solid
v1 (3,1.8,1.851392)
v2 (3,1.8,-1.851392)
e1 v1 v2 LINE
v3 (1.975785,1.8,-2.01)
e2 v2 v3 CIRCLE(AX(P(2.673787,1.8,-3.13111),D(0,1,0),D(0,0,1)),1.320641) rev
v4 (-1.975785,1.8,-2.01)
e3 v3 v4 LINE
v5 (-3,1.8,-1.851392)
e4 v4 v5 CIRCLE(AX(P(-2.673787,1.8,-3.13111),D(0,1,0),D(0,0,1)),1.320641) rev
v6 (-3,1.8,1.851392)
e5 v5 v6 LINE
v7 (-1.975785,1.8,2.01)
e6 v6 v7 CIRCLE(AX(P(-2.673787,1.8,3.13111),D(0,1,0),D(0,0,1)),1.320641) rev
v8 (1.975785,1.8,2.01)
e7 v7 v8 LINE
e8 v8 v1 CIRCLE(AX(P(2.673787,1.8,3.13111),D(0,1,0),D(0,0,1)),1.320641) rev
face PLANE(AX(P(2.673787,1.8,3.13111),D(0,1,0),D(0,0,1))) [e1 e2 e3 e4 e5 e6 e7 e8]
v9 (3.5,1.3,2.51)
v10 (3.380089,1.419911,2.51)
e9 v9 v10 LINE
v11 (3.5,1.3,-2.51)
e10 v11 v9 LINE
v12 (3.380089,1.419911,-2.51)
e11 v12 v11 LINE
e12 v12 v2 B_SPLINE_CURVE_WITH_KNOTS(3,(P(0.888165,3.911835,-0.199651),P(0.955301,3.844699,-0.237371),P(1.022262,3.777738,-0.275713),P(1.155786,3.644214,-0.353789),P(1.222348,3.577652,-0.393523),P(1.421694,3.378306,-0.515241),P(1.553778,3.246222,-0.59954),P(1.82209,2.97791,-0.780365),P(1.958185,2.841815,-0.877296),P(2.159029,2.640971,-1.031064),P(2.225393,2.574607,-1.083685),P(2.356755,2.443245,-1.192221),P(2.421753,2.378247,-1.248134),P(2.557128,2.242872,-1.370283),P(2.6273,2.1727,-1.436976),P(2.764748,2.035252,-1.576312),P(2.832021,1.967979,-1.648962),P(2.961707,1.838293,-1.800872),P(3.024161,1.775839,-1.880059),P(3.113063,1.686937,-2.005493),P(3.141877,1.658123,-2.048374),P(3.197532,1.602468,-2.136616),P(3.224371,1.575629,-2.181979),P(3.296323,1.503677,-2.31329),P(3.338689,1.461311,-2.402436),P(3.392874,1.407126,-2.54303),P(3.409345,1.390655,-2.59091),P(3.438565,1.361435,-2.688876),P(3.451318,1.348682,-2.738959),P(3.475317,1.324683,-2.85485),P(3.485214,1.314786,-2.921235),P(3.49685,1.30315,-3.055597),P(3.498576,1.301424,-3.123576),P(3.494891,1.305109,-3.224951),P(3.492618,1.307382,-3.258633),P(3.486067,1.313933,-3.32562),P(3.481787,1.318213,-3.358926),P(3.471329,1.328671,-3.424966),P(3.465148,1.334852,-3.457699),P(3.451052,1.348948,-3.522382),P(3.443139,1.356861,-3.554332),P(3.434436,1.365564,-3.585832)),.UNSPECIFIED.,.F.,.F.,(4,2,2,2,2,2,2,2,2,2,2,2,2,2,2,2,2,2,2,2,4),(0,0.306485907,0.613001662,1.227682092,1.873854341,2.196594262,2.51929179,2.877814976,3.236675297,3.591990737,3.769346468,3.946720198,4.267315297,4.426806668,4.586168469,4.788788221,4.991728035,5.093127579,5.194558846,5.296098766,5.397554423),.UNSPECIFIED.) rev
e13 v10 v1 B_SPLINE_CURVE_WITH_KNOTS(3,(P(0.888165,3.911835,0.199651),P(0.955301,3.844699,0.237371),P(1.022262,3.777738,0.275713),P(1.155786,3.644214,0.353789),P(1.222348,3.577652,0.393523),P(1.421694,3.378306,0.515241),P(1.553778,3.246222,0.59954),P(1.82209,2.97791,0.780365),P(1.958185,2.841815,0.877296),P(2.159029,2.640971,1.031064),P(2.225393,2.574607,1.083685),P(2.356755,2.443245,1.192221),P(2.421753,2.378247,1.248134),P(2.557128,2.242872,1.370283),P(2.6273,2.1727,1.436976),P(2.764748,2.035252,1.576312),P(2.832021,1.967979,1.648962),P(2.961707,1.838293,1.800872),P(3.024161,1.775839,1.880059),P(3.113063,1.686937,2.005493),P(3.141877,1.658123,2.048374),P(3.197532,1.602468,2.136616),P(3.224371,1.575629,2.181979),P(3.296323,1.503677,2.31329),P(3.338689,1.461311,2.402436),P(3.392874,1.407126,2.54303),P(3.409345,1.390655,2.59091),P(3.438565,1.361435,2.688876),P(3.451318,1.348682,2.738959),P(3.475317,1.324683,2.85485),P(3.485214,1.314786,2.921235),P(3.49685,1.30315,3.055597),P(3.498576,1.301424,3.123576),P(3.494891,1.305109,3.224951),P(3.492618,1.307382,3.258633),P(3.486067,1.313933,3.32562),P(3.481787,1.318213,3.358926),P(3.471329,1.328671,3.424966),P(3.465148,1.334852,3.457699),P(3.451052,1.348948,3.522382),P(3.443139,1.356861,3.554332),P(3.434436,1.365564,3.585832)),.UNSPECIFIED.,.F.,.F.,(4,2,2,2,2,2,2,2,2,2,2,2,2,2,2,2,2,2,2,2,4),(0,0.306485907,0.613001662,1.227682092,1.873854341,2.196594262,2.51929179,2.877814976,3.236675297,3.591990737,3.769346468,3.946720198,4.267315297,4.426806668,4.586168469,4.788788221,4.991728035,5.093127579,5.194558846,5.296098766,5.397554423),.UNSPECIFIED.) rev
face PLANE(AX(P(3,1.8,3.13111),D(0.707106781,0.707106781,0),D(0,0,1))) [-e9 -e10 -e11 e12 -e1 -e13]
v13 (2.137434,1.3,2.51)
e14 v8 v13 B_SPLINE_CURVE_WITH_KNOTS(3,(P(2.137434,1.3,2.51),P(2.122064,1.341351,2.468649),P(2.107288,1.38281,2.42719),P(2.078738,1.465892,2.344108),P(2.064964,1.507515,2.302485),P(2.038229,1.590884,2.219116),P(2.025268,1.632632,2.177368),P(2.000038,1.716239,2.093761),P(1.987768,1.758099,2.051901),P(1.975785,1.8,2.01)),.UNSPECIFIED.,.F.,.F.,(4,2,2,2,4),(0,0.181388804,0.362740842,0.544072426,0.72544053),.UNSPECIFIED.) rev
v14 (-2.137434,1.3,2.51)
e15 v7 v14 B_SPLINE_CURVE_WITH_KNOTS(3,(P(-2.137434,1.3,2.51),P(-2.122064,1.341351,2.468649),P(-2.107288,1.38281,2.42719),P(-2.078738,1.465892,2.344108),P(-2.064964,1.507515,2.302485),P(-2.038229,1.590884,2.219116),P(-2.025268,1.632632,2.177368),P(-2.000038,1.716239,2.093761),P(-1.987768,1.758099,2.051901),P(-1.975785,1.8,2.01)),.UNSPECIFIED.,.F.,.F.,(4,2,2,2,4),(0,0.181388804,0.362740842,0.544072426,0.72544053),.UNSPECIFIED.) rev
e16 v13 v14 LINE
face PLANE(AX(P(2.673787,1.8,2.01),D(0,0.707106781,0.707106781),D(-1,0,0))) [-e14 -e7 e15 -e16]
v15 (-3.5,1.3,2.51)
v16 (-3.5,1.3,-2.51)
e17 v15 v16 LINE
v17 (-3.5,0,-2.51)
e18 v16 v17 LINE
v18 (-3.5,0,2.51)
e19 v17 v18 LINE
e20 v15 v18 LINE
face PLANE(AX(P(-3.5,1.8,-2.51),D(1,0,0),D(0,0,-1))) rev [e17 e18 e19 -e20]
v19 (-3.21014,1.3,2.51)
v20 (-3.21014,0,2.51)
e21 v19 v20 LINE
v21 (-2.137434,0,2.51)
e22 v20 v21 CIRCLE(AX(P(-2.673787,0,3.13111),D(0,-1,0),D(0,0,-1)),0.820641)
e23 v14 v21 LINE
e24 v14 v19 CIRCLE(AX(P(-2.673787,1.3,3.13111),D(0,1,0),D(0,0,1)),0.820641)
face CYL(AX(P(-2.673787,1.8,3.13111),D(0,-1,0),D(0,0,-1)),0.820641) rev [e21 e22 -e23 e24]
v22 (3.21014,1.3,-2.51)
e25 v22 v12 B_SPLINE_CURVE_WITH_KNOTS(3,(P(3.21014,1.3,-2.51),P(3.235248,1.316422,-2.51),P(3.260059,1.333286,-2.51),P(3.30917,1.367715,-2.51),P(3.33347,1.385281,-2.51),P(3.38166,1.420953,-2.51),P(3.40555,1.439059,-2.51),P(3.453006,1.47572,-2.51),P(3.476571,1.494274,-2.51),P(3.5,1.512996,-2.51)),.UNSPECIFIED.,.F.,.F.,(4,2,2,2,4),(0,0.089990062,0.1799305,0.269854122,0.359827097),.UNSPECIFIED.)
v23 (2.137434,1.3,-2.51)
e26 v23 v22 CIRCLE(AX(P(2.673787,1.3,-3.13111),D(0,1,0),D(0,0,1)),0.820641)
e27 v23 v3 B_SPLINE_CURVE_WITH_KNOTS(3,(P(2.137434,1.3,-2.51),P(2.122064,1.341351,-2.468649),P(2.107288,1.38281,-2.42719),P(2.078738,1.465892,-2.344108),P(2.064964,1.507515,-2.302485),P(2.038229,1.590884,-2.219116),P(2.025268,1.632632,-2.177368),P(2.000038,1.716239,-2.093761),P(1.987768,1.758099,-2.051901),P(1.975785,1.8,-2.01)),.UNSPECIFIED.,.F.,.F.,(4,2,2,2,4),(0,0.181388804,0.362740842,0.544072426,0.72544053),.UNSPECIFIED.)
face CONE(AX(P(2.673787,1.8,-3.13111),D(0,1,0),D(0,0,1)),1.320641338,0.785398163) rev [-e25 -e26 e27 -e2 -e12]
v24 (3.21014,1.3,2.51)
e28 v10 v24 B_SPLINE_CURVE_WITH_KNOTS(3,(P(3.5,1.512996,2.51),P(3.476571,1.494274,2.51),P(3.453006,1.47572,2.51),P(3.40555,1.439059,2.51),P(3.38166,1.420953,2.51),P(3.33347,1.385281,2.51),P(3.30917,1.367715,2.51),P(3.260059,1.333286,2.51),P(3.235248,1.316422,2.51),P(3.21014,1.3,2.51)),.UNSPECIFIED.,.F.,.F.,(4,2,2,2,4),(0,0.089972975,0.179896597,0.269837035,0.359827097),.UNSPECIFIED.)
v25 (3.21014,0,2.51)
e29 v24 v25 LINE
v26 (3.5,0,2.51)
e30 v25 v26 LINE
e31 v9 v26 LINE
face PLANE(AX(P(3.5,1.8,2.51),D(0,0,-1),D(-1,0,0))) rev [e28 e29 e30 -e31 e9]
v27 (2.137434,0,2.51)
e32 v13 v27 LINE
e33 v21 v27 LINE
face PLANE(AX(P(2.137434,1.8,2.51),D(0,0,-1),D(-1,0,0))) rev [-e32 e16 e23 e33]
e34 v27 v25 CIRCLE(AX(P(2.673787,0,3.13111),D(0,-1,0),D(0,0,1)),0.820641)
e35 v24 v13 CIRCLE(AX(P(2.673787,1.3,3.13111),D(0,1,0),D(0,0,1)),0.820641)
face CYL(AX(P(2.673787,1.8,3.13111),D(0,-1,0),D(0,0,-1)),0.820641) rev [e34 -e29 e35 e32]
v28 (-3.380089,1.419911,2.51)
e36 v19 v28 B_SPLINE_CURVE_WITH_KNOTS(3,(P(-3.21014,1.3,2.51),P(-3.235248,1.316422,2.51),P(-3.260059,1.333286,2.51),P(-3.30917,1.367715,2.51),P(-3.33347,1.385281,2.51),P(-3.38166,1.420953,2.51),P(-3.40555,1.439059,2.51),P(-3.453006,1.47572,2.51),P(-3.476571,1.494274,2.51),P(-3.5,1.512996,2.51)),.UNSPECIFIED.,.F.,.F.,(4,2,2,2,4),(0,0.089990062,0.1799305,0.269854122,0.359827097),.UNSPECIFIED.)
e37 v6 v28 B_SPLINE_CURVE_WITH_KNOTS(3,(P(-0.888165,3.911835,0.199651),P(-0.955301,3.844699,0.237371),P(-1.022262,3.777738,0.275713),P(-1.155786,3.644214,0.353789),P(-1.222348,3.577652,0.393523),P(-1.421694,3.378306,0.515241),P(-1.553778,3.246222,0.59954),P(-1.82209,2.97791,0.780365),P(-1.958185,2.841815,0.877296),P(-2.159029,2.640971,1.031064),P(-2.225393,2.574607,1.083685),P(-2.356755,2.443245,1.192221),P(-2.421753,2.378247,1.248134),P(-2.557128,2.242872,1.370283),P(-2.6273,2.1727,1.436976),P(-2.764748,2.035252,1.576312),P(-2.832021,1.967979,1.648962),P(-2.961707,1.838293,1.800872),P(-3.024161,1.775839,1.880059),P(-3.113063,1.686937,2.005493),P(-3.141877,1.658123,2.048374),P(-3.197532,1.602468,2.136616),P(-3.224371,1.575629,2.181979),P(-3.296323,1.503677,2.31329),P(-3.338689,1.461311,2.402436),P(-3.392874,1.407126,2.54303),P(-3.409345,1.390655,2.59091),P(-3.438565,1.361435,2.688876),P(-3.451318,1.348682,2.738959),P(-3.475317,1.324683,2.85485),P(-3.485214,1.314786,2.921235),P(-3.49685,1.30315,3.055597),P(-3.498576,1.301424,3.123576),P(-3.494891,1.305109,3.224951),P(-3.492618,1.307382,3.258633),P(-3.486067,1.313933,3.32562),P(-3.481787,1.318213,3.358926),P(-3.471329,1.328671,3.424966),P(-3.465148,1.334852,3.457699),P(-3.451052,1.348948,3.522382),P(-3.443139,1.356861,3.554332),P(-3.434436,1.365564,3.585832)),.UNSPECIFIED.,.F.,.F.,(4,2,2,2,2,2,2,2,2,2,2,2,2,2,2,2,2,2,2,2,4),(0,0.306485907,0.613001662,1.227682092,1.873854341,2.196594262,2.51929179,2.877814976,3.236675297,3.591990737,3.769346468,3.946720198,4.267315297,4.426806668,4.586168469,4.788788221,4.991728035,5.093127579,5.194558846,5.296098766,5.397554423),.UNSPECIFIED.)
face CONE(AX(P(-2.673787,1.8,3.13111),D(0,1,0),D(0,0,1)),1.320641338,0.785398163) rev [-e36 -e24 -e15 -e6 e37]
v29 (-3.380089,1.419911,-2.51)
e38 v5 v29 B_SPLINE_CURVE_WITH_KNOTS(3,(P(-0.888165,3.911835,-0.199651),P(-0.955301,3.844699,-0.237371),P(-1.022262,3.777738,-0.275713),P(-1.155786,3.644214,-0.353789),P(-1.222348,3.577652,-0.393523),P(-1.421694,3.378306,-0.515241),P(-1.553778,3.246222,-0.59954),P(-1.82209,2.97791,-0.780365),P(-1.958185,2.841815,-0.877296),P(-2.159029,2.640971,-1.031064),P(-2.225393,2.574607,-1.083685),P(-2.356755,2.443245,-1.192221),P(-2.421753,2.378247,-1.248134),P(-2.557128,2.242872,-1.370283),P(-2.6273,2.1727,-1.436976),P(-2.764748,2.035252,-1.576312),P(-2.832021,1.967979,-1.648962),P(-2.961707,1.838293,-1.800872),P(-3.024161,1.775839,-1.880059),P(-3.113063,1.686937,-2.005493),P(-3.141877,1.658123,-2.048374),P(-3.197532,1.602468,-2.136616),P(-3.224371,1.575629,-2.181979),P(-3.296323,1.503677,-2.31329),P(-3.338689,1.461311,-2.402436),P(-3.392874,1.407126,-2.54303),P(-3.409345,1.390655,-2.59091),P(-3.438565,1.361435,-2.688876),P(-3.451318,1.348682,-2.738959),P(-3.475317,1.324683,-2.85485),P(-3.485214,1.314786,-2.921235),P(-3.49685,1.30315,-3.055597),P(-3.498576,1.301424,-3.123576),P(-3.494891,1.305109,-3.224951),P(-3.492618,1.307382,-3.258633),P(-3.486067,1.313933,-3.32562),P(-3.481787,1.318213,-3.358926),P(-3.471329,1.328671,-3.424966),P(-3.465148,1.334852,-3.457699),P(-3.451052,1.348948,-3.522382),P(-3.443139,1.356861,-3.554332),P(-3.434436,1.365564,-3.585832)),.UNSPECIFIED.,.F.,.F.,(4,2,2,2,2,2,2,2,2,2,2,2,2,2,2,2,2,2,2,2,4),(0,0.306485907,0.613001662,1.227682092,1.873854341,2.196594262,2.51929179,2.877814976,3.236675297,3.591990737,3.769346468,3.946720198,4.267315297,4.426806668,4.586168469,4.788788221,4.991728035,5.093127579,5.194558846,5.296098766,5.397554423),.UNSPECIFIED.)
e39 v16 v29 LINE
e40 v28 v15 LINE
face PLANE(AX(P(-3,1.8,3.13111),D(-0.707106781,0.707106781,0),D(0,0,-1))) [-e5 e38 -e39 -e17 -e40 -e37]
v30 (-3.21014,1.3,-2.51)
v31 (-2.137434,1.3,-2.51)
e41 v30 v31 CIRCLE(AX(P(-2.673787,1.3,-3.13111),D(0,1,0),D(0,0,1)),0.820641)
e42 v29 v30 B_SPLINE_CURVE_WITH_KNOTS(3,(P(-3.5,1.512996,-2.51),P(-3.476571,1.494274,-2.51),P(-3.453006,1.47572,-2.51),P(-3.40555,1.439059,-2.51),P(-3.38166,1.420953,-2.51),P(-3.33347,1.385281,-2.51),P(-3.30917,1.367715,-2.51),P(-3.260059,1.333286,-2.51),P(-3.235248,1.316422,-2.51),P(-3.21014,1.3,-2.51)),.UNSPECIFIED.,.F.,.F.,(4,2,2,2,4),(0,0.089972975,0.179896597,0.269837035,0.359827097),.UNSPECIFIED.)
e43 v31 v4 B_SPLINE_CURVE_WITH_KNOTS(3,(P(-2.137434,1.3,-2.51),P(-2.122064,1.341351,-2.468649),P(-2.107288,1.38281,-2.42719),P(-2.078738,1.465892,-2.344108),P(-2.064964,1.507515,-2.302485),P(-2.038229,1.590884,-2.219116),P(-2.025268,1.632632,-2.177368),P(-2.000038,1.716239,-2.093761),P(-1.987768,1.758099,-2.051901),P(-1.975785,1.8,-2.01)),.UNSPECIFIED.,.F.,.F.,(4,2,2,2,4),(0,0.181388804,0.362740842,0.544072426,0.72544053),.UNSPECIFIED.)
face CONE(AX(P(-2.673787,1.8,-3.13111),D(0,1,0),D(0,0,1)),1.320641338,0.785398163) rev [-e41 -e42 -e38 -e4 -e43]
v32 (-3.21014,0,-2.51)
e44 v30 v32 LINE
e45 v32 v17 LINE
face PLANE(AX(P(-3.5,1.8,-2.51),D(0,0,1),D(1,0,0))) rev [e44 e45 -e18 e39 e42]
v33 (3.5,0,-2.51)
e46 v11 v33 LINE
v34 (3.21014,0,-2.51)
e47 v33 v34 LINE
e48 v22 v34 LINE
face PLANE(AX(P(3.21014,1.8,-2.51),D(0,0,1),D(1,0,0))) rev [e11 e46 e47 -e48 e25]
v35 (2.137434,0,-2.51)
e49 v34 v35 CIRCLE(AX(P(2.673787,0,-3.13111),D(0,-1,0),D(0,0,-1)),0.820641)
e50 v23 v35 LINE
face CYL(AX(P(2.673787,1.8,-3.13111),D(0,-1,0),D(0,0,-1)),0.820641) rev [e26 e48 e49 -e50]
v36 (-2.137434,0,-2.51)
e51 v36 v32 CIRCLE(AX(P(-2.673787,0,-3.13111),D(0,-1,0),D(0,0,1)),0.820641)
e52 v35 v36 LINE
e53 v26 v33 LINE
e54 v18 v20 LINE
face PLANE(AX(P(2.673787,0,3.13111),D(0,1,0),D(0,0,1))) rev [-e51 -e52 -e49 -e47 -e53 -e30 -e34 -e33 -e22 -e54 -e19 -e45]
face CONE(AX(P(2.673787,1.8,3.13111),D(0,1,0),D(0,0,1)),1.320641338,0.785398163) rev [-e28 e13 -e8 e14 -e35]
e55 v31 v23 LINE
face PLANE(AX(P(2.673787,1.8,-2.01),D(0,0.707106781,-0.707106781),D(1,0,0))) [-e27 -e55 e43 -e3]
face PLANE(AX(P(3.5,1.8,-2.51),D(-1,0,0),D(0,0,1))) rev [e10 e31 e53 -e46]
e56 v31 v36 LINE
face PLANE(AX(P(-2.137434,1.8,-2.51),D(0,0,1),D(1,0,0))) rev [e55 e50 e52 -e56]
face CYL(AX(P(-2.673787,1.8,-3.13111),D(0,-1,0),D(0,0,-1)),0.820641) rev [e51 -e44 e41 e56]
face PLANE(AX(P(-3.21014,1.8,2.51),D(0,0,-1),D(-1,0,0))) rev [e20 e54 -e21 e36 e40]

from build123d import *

# Parameters (mm, degrees)
EXTRUDE_1_DEPTH = 1.8
CHAMFER_1_SIZE  = 0.5


with BuildPart() as part:
    # Эскиз1 → Бобышка-Вытянуть1 (new body)
    with BuildSketch(Plane(origin=(0, 0, 0), x_dir=(1, 0, 0), z_dir=(0, 1, 0))):
        with BuildLine():
            Line((-3.5, 2.51), (-3.210140252, 2.51))
            ThreePointArc((-3.210140252, 2.51), (-2.673786949, 2.310468426), (-2.137433645, 2.51))
            Line((-2.137433645, 2.51), (2.137433645, 2.51))
            ThreePointArc((2.137433645, 2.51), (2.673786949, 2.310468426), (3.210140252, 2.51))
            Line((3.210140252, 2.51), (3.5, 2.51))
            Line((3.5, 2.51), (3.5, -2.51))
            Line((3.5, -2.51), (3.210140252, -2.51))
            ThreePointArc((3.210140252, -2.51), (2.673786949, -2.310468426), (2.137433645, -2.51))
            Line((2.137433645, -2.51), (-2.137433645, -2.51))
            ThreePointArc((-2.137433645, -2.51), (-2.673786949, -2.310468426), (-3.210140252, -2.51))
            Line((-3.210140252, -2.51), (-3.5, -2.51))
            Line((-3.5, -2.51), (-3.5, 2.51))
        make_face()
    extrude(amount=EXTRUDE_1_DEPTH)

    # Фаска1
    chamfer_1_edges = [part.edges().sort_by_distance(p)[0] for p in [
        (-3.5, 1.8, 0),
    ]]
    chamfer(chamfer_1_edges, length=CHAMFER_1_SIZE)
    chamfer_1_2_edges = [part.edges().sort_by_distance(p)[0] for p in [
        (3.5, 1.8, 0),
    ]]
    chamfer(chamfer_1_2_edges, length=CHAMFER_1_SIZE)
    chamfer_1_3_edges = [part.edges().sort_by_distance(p)[0] for p in [
        (-2.54973161, 1.8, 2.319899262),
    ]]
    chamfer(chamfer_1_3_edges, length=CHAMFER_1_SIZE)
    chamfer_1_4_edges = [part.edges().sort_by_distance(p)[0] for p in [
        (-2.54973161, 1.8, -2.319899262),
    ]]
    chamfer(chamfer_1_4_edges, length=CHAMFER_1_SIZE)
    chamfer_1_5_edges = [part.edges().sort_by_distance(p)[0] for p in [
        (2.54973161, 1.8, -2.319899262),
    ]]
    chamfer(chamfer_1_5_edges, length=CHAMFER_1_SIZE)
    chamfer_1_6_edges = [part.edges().sort_by_distance(p)[0] for p in [
        (2.54973161, 1.8, 2.319899262),
    ]]
    chamfer(chamfer_1_6_edges, length=CHAMFER_1_SIZE)
    chamfer_1_7_edges = [part.edges().sort_by_distance(p)[0] for p in [
        (0, 1.8, -2.51),
    ]]
    chamfer(chamfer_1_7_edges, length=CHAMFER_1_SIZE)
    chamfer_1_8_edges = [part.edges().sort_by_distance(p)[0] for p in [
        (0, 1.8, 2.51),
    ]]
    chamfer(chamfer_1_8_edges, length=CHAMFER_1_SIZE)


solid = part.part
